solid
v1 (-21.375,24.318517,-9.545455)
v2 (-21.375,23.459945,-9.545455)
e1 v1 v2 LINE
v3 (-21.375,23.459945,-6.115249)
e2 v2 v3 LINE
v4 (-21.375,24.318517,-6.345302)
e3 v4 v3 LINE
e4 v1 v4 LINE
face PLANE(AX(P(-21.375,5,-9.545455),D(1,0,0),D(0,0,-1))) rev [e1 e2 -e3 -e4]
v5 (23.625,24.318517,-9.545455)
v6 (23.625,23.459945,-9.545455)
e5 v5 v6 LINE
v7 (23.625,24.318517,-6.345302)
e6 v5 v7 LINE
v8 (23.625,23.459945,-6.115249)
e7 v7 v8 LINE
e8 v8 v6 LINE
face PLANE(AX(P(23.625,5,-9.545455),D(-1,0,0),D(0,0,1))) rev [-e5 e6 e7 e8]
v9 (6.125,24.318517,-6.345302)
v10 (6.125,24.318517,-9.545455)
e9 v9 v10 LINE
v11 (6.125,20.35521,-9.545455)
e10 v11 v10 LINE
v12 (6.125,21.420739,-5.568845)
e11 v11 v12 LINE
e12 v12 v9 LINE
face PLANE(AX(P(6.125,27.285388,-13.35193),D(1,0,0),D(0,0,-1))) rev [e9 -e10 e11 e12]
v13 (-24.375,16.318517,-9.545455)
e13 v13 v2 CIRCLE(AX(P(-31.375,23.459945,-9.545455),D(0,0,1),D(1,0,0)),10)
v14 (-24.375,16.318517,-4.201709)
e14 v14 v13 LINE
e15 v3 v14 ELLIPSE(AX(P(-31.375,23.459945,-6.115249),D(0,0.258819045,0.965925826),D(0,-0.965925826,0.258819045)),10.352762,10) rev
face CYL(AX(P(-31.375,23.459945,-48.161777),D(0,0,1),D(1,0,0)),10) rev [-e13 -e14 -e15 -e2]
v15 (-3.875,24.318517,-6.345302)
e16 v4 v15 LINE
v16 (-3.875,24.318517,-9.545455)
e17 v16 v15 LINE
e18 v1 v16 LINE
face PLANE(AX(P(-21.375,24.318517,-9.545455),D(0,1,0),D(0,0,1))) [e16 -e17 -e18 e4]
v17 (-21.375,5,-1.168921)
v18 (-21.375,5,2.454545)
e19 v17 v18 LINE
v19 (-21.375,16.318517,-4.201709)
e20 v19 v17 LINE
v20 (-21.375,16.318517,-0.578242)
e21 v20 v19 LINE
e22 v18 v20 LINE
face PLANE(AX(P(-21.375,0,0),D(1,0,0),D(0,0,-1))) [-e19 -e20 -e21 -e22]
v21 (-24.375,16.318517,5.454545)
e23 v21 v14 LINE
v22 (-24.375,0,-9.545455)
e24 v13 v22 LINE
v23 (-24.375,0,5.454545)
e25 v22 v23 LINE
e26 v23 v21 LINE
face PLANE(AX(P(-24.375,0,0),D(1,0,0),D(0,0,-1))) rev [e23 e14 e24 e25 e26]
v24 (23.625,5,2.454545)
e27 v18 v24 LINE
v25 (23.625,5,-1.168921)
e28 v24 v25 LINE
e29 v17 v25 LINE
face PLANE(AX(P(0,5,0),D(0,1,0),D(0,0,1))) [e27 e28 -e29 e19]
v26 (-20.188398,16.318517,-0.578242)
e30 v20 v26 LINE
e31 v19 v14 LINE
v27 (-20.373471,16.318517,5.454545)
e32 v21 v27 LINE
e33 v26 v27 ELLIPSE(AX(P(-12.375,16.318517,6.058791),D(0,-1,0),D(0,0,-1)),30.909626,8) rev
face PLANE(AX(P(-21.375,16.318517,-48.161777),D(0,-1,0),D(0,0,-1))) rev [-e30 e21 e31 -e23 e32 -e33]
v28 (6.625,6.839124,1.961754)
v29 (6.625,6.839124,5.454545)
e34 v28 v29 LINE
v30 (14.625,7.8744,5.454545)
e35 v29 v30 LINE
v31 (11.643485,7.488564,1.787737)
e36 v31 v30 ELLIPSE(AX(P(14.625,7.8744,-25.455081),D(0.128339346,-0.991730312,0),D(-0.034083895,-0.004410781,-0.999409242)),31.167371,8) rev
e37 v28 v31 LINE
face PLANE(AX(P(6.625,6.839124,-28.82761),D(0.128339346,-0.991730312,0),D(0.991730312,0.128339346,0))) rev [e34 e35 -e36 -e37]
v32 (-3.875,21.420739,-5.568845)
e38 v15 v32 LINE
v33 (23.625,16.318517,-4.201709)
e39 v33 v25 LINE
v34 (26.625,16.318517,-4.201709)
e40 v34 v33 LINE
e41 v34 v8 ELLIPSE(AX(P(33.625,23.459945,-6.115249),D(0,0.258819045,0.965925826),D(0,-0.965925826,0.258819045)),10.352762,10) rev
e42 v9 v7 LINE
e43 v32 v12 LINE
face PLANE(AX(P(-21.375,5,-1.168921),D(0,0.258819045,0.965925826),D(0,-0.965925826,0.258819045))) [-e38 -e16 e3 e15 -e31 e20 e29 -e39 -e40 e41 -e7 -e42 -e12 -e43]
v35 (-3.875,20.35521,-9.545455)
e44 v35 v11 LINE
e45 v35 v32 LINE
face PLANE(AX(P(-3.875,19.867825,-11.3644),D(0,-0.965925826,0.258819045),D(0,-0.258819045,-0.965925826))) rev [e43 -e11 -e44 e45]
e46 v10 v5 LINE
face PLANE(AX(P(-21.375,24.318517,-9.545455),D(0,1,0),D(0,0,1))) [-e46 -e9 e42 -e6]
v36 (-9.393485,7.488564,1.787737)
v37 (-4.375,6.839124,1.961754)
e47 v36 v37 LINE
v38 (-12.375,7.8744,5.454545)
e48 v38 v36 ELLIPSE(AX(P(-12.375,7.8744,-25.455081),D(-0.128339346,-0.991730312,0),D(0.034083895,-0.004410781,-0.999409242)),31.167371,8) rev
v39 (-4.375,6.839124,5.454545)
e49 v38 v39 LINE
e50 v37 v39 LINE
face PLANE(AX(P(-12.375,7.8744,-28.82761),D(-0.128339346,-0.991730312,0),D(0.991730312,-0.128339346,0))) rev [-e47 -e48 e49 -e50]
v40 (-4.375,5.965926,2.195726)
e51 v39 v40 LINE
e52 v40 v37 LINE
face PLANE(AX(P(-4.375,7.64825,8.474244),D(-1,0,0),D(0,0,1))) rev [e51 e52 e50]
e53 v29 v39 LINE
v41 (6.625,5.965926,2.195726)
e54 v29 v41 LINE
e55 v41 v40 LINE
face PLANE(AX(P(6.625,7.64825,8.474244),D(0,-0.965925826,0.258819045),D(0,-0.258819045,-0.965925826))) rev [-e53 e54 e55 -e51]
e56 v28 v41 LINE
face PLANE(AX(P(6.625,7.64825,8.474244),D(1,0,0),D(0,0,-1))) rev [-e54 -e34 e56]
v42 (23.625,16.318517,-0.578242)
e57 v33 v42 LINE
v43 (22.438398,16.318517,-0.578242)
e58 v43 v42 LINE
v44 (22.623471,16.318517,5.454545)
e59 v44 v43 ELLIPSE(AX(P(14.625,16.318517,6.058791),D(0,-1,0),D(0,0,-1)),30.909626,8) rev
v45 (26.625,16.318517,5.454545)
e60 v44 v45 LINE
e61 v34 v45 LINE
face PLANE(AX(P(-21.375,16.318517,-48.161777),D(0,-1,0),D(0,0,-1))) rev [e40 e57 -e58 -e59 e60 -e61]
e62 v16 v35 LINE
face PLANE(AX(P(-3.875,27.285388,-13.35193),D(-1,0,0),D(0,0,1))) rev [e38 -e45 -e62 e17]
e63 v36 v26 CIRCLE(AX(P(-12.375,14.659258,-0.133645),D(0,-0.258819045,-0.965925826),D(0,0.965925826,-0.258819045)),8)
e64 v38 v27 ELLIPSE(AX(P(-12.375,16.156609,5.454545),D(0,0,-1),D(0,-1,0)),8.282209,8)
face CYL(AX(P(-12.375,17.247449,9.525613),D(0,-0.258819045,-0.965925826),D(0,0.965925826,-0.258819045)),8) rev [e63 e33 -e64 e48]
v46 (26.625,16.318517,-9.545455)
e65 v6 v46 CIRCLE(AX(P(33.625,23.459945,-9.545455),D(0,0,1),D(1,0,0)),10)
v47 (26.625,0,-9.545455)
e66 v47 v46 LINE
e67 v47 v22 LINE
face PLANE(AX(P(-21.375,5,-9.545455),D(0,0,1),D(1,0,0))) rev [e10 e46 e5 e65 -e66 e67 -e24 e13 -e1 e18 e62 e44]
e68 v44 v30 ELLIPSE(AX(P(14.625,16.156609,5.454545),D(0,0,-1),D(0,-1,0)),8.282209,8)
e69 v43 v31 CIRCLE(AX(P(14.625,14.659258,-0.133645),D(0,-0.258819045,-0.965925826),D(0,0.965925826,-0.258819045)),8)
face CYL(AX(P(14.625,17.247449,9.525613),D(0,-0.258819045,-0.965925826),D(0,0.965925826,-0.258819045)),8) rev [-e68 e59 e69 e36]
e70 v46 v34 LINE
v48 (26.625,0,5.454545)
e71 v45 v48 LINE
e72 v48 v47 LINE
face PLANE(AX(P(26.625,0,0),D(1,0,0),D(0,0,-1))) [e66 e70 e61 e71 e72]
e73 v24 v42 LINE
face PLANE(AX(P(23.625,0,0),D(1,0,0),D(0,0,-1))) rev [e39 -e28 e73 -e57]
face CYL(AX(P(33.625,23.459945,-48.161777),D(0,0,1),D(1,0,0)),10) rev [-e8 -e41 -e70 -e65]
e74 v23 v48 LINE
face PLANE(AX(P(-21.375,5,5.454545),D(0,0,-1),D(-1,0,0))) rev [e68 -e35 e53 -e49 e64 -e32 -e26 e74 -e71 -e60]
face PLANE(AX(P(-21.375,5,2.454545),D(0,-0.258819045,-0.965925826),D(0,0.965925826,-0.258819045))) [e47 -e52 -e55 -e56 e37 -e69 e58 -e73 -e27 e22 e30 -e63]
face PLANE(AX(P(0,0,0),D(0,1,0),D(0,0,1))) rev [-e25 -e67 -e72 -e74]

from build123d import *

# Parameters (mm, degrees)
SKETCH1_W           = 45
SKETCH1_H           = 15
BOSS_EXTRUDE1_DEPTH = 5
BOSS_EXTRUDE2_DEPTH = 45
SKETCH5_R           = 8
CUT_EXTRUDE1_DEPTH  = 10
CUT_EXTRUDE2_REACH  = 39.075
SKETCH6_W           = 45
SKETCH6_H           = 8
SKETCH7_W           = 11
SKETCH7_H           = 10.717790556
CUT_EXTRUDE4_DEPTH  = 6.5
CUT_EXTRUDE5_REACH  = 39.075
SKETCH10_W          = 15
SKETCH10_H          = 16.318516526
BOSS_EXTRUDE3_DEPTH = 3
SKETCH11_W          = 15
SKETCH11_H          = 16.318516526
BOSS_EXTRUDE4_DEPTH = 3
SKETCH12_W          = 10
SKETCH12_H          = 7.679226714
CUT_EXTRUDE6_DEPTH  = 6
FILLET1_R           = 10


with BuildPart() as part:
    # Sketch1 → Boss-Extrude1 (new body)
    with BuildSketch(Plane(origin=(0, 0, 0), x_dir=(1, 0, 0), z_dir=(0, 1, 0))):
        with Locations((1.125, 2.045454545)):
            Rectangle(SKETCH1_W, SKETCH1_H)
    extrude(amount=BOSS_EXTRUDE1_DEPTH)

    # Sketch2 → Boss-Extrude2 (add)
    with BuildSketch(Plane(origin=(23.625, 0, 0), x_dir=(0, 0, -1), z_dir=(1, 0, 0))):
        Polygon((-2.454545455, 5), (2.721835448, 24.318516526), (-5.454545455, 24.318516526), (-5.454545455, 5), align=None)
        Polygon((1.168921177, 5), (6.345302079, 24.318516526), (9.545454545, 24.318516526), (9.545454545, 5), align=None)
    extrude(amount=-BOSS_EXTRUDE2_DEPTH)

    # Sketch5 → Cut-Extrude1 (cut)
    with BuildSketch(Plane(origin=(0, 0.948572854, 3.540122086), x_dir=(-1, 0, 0), z_dir=(0, -0.2588190451025247, -0.9659258262890673))):
        with Locations(Location((12.375, 14.194346021, 0), (0, 0, 90))):
            Circle(SKETCH5_R)
        with Locations(Location((-14.625, 14.194346021, 0), (0, 0, 90))):
            Circle(SKETCH5_R)
    extrude(amount=-CUT_EXTRUDE1_DEPTH, mode=Mode.SUBTRACT)

    # Cut-Extrude2: up to this plane
    cut_extrude2_end = Plane(origin=(-21.375, 5, 2.454545455), z_dir=(0, -0.2588190451025246, -0.9659258262890673))
    # Sketch6 → Cut-Extrude2 (cut, up to the surface)
    with BuildSketch(Plane.XY.offset(5.454545455), mode=Mode.PRIVATE) as cut_extrude2_sk1:
        with Locations((1.125, 20.318516526)):
            Rectangle(SKETCH6_W, SKETCH6_H)
    cut_extrude2_tool1 = split(extrude(cut_extrude2_sk1.sketch, amount=-CUT_EXTRUDE2_REACH, mode=Mode.PRIVATE), bisect_by=cut_extrude2_end, keep=Keep.BOTH, mode=Mode.PRIVATE)
    add(cut_extrude2_tool1.solids().sort_by_distance((1.125, 20.318517, 5.454545))[0], mode=Mode.SUBTRACT)

    # Sketch7 → Cut-Extrude4 (cut)
    with BuildSketch(Plane(origin=(0, 0.948572854, 3.540122086), x_dir=(-1, 0, 0), z_dir=(0, -0.2588190451025247, -0.9659258262890673))):
        with Locations((-1.125, 10.553241299)):
            Rectangle(SKETCH7_W, SKETCH7_H)
    extrude(amount=-CUT_EXTRUDE4_DEPTH, mode=Mode.SUBTRACT)


with BuildPart() as cut_extrude4_piece_1:
    # of the separate pieces the step leaves, piece 1, a body of its own (cut_extrude4_pieces)
    add(part.part.solids().sort_by_distance((-21.375, 0, -9.545454545))[0])


with BuildPart() as cut_extrude4_piece_2:
    # of the separate pieces the step leaves, piece 2, a body of its own (cut_extrude4_pieces)
    add(part.part.solids().sort_by_distance((-4.375, 16.318516526, -0.578241908))[0])


with BuildPart() as cut_extrude4_piece_3:
    # of the separate pieces the step leaves, piece 3, a body of its own (cut_extrude4_pieces)
    add(part.part.solids().sort_by_distance((6.811601533, 16.318516526, -0.578241908))[0])


with BuildPart() as cut_extrude5_tool:
    # Cut-Extrude5: up to this plane
    cut_extrude5_end = Plane(origin=(-21.375, 5, 2.454545455), z_dir=(0, -0.2588190451025246, -0.9659258262890673))
    # Sketch9 → Cut-Extrude5 (new, up to the surface)
    with BuildSketch(Plane.XY.offset(5.454545455), mode=Mode.PRIVATE) as cut_extrude5_sk1:
        Polygon((-12.375, 7.874399938), (-4.375, 6.839123758), (6.625, 6.839123758), (14.625, 7.874399938), (14.625, 17.142741254), (-12.375, 17.142741254), align=None)
    cut_extrude5_tool1 = split(extrude(cut_extrude5_sk1.sketch, amount=-CUT_EXTRUDE5_REACH, mode=Mode.PRIVATE), bisect_by=cut_extrude5_end, keep=Keep.BOTH, mode=Mode.PRIVATE)
    add(cut_extrude5_tool1.solids().sort_by_distance((1.125, 12.138424, 5.454545))[0])


with BuildPart() as cut_extrude4_piece_1_1:
    add(cut_extrude4_piece_1.part)

    # Cut-Extrude5: cut by cut_extrude5_tool
    add(cut_extrude5_tool.part, mode=Mode.SUBTRACT)

    # Sketch10 → Boss-Extrude3 (add)
    with BuildSketch(Plane.ZY.offset(21.375)):
        with Locations((-2.045454545, 8.159258263)):
            Rectangle(SKETCH10_W, SKETCH10_H)
    extrude(amount=BOSS_EXTRUDE3_DEPTH)

    # Sketch11 → Boss-Extrude4 (add)
    with BuildSketch(Plane(origin=(23.625, 0, 0), x_dir=(0, 0, -1), z_dir=(1, 0, 0))):
        with Locations((2.045454545, 8.159258263)):
            Rectangle(SKETCH11_W, SKETCH11_H)
    extrude(amount=BOSS_EXTRUDE4_DEPTH)

    # Sketch12 → Cut-Extrude6 (cut)
    with BuildSketch(Plane(origin=(0, 0.042706196, 0.159381694), x_dir=(1, 0, 0), z_dir=(0, 0.2588190451025247, 0.9659258262890673))):
        with Locations((1.125, 25.971781551)):
            Rectangle(SKETCH12_W, SKETCH12_H)
    extrude(amount=-CUT_EXTRUDE6_DEPTH, mode=Mode.SUBTRACT)

    # Fillet1
    # the kernel refuses this fillet: 10 mm, written as the material it adds along each edge
    with BuildSketch(Plane(origin=(-21.375, 16.318516526, 13.651862532), x_dir=(-1, 0, 0), z_dir=(0, 0, -1))) as fillet1_piece_1_section:
        with BuildLine():
            CenterArc((10, 7.141428429), FILLET1_R, 180, 45.572995999)
            Line((0, 7.141428429), (0, 0))
            Line((0, 0), (3, 0))
        make_face()
    fillet1_piece_1 = extrude(amount=23.197317077, mode=Mode.PRIVATE)
    fillet1_piece_1 = split(fillet1_piece_1, bisect_by=Plane(origin=(-22.137016454, 20.028758468, -5.195864872), z_dir=(0, -0.2588190451025247, -0.9659258262890673)), keep=Keep.TOP, mode=Mode.PRIVATE)
    add(fillet1_piece_1)
    with BuildSketch(Plane(origin=(23.625, 16.318516526, 13.651862532), x_dir=(1, 0, 0), z_dir=(0, 0, -1))) as fillet1_piece_2_section:
        with BuildLine():
            CenterArc((10, -7.141428429), FILLET1_R, 134.427004001, 45.572995999)
            Line((0, -7.141428429), (0, 0))
            Line((0, 0), (3, 0))
        make_face()
    fillet1_piece_2 = extrude(amount=23.197317077, mode=Mode.PRIVATE)
    fillet1_piece_2 = split(fillet1_piece_2, bisect_by=Plane(origin=(24.387016454, 20.028758468, -5.195864872), z_dir=(0, -0.2588190451025247, -0.9659258262890673)), keep=Keep.TOP, mode=Mode.PRIVATE)
    add(fillet1_piece_2)


with BuildPart() as cut_extrude4_piece_2_1:
    add(cut_extrude4_piece_2.part)

    # Cut-Extrude5: cut by cut_extrude5_tool
    add(cut_extrude5_tool.part, mode=Mode.SUBTRACT)


with BuildPart() as cut_extrude4_piece_3_1:
    add(cut_extrude4_piece_3.part)

    # Cut-Extrude5: cut by cut_extrude5_tool
    add(cut_extrude5_tool.part, mode=Mode.SUBTRACT)


solid = cut_extrude4_piece_1_1.part
